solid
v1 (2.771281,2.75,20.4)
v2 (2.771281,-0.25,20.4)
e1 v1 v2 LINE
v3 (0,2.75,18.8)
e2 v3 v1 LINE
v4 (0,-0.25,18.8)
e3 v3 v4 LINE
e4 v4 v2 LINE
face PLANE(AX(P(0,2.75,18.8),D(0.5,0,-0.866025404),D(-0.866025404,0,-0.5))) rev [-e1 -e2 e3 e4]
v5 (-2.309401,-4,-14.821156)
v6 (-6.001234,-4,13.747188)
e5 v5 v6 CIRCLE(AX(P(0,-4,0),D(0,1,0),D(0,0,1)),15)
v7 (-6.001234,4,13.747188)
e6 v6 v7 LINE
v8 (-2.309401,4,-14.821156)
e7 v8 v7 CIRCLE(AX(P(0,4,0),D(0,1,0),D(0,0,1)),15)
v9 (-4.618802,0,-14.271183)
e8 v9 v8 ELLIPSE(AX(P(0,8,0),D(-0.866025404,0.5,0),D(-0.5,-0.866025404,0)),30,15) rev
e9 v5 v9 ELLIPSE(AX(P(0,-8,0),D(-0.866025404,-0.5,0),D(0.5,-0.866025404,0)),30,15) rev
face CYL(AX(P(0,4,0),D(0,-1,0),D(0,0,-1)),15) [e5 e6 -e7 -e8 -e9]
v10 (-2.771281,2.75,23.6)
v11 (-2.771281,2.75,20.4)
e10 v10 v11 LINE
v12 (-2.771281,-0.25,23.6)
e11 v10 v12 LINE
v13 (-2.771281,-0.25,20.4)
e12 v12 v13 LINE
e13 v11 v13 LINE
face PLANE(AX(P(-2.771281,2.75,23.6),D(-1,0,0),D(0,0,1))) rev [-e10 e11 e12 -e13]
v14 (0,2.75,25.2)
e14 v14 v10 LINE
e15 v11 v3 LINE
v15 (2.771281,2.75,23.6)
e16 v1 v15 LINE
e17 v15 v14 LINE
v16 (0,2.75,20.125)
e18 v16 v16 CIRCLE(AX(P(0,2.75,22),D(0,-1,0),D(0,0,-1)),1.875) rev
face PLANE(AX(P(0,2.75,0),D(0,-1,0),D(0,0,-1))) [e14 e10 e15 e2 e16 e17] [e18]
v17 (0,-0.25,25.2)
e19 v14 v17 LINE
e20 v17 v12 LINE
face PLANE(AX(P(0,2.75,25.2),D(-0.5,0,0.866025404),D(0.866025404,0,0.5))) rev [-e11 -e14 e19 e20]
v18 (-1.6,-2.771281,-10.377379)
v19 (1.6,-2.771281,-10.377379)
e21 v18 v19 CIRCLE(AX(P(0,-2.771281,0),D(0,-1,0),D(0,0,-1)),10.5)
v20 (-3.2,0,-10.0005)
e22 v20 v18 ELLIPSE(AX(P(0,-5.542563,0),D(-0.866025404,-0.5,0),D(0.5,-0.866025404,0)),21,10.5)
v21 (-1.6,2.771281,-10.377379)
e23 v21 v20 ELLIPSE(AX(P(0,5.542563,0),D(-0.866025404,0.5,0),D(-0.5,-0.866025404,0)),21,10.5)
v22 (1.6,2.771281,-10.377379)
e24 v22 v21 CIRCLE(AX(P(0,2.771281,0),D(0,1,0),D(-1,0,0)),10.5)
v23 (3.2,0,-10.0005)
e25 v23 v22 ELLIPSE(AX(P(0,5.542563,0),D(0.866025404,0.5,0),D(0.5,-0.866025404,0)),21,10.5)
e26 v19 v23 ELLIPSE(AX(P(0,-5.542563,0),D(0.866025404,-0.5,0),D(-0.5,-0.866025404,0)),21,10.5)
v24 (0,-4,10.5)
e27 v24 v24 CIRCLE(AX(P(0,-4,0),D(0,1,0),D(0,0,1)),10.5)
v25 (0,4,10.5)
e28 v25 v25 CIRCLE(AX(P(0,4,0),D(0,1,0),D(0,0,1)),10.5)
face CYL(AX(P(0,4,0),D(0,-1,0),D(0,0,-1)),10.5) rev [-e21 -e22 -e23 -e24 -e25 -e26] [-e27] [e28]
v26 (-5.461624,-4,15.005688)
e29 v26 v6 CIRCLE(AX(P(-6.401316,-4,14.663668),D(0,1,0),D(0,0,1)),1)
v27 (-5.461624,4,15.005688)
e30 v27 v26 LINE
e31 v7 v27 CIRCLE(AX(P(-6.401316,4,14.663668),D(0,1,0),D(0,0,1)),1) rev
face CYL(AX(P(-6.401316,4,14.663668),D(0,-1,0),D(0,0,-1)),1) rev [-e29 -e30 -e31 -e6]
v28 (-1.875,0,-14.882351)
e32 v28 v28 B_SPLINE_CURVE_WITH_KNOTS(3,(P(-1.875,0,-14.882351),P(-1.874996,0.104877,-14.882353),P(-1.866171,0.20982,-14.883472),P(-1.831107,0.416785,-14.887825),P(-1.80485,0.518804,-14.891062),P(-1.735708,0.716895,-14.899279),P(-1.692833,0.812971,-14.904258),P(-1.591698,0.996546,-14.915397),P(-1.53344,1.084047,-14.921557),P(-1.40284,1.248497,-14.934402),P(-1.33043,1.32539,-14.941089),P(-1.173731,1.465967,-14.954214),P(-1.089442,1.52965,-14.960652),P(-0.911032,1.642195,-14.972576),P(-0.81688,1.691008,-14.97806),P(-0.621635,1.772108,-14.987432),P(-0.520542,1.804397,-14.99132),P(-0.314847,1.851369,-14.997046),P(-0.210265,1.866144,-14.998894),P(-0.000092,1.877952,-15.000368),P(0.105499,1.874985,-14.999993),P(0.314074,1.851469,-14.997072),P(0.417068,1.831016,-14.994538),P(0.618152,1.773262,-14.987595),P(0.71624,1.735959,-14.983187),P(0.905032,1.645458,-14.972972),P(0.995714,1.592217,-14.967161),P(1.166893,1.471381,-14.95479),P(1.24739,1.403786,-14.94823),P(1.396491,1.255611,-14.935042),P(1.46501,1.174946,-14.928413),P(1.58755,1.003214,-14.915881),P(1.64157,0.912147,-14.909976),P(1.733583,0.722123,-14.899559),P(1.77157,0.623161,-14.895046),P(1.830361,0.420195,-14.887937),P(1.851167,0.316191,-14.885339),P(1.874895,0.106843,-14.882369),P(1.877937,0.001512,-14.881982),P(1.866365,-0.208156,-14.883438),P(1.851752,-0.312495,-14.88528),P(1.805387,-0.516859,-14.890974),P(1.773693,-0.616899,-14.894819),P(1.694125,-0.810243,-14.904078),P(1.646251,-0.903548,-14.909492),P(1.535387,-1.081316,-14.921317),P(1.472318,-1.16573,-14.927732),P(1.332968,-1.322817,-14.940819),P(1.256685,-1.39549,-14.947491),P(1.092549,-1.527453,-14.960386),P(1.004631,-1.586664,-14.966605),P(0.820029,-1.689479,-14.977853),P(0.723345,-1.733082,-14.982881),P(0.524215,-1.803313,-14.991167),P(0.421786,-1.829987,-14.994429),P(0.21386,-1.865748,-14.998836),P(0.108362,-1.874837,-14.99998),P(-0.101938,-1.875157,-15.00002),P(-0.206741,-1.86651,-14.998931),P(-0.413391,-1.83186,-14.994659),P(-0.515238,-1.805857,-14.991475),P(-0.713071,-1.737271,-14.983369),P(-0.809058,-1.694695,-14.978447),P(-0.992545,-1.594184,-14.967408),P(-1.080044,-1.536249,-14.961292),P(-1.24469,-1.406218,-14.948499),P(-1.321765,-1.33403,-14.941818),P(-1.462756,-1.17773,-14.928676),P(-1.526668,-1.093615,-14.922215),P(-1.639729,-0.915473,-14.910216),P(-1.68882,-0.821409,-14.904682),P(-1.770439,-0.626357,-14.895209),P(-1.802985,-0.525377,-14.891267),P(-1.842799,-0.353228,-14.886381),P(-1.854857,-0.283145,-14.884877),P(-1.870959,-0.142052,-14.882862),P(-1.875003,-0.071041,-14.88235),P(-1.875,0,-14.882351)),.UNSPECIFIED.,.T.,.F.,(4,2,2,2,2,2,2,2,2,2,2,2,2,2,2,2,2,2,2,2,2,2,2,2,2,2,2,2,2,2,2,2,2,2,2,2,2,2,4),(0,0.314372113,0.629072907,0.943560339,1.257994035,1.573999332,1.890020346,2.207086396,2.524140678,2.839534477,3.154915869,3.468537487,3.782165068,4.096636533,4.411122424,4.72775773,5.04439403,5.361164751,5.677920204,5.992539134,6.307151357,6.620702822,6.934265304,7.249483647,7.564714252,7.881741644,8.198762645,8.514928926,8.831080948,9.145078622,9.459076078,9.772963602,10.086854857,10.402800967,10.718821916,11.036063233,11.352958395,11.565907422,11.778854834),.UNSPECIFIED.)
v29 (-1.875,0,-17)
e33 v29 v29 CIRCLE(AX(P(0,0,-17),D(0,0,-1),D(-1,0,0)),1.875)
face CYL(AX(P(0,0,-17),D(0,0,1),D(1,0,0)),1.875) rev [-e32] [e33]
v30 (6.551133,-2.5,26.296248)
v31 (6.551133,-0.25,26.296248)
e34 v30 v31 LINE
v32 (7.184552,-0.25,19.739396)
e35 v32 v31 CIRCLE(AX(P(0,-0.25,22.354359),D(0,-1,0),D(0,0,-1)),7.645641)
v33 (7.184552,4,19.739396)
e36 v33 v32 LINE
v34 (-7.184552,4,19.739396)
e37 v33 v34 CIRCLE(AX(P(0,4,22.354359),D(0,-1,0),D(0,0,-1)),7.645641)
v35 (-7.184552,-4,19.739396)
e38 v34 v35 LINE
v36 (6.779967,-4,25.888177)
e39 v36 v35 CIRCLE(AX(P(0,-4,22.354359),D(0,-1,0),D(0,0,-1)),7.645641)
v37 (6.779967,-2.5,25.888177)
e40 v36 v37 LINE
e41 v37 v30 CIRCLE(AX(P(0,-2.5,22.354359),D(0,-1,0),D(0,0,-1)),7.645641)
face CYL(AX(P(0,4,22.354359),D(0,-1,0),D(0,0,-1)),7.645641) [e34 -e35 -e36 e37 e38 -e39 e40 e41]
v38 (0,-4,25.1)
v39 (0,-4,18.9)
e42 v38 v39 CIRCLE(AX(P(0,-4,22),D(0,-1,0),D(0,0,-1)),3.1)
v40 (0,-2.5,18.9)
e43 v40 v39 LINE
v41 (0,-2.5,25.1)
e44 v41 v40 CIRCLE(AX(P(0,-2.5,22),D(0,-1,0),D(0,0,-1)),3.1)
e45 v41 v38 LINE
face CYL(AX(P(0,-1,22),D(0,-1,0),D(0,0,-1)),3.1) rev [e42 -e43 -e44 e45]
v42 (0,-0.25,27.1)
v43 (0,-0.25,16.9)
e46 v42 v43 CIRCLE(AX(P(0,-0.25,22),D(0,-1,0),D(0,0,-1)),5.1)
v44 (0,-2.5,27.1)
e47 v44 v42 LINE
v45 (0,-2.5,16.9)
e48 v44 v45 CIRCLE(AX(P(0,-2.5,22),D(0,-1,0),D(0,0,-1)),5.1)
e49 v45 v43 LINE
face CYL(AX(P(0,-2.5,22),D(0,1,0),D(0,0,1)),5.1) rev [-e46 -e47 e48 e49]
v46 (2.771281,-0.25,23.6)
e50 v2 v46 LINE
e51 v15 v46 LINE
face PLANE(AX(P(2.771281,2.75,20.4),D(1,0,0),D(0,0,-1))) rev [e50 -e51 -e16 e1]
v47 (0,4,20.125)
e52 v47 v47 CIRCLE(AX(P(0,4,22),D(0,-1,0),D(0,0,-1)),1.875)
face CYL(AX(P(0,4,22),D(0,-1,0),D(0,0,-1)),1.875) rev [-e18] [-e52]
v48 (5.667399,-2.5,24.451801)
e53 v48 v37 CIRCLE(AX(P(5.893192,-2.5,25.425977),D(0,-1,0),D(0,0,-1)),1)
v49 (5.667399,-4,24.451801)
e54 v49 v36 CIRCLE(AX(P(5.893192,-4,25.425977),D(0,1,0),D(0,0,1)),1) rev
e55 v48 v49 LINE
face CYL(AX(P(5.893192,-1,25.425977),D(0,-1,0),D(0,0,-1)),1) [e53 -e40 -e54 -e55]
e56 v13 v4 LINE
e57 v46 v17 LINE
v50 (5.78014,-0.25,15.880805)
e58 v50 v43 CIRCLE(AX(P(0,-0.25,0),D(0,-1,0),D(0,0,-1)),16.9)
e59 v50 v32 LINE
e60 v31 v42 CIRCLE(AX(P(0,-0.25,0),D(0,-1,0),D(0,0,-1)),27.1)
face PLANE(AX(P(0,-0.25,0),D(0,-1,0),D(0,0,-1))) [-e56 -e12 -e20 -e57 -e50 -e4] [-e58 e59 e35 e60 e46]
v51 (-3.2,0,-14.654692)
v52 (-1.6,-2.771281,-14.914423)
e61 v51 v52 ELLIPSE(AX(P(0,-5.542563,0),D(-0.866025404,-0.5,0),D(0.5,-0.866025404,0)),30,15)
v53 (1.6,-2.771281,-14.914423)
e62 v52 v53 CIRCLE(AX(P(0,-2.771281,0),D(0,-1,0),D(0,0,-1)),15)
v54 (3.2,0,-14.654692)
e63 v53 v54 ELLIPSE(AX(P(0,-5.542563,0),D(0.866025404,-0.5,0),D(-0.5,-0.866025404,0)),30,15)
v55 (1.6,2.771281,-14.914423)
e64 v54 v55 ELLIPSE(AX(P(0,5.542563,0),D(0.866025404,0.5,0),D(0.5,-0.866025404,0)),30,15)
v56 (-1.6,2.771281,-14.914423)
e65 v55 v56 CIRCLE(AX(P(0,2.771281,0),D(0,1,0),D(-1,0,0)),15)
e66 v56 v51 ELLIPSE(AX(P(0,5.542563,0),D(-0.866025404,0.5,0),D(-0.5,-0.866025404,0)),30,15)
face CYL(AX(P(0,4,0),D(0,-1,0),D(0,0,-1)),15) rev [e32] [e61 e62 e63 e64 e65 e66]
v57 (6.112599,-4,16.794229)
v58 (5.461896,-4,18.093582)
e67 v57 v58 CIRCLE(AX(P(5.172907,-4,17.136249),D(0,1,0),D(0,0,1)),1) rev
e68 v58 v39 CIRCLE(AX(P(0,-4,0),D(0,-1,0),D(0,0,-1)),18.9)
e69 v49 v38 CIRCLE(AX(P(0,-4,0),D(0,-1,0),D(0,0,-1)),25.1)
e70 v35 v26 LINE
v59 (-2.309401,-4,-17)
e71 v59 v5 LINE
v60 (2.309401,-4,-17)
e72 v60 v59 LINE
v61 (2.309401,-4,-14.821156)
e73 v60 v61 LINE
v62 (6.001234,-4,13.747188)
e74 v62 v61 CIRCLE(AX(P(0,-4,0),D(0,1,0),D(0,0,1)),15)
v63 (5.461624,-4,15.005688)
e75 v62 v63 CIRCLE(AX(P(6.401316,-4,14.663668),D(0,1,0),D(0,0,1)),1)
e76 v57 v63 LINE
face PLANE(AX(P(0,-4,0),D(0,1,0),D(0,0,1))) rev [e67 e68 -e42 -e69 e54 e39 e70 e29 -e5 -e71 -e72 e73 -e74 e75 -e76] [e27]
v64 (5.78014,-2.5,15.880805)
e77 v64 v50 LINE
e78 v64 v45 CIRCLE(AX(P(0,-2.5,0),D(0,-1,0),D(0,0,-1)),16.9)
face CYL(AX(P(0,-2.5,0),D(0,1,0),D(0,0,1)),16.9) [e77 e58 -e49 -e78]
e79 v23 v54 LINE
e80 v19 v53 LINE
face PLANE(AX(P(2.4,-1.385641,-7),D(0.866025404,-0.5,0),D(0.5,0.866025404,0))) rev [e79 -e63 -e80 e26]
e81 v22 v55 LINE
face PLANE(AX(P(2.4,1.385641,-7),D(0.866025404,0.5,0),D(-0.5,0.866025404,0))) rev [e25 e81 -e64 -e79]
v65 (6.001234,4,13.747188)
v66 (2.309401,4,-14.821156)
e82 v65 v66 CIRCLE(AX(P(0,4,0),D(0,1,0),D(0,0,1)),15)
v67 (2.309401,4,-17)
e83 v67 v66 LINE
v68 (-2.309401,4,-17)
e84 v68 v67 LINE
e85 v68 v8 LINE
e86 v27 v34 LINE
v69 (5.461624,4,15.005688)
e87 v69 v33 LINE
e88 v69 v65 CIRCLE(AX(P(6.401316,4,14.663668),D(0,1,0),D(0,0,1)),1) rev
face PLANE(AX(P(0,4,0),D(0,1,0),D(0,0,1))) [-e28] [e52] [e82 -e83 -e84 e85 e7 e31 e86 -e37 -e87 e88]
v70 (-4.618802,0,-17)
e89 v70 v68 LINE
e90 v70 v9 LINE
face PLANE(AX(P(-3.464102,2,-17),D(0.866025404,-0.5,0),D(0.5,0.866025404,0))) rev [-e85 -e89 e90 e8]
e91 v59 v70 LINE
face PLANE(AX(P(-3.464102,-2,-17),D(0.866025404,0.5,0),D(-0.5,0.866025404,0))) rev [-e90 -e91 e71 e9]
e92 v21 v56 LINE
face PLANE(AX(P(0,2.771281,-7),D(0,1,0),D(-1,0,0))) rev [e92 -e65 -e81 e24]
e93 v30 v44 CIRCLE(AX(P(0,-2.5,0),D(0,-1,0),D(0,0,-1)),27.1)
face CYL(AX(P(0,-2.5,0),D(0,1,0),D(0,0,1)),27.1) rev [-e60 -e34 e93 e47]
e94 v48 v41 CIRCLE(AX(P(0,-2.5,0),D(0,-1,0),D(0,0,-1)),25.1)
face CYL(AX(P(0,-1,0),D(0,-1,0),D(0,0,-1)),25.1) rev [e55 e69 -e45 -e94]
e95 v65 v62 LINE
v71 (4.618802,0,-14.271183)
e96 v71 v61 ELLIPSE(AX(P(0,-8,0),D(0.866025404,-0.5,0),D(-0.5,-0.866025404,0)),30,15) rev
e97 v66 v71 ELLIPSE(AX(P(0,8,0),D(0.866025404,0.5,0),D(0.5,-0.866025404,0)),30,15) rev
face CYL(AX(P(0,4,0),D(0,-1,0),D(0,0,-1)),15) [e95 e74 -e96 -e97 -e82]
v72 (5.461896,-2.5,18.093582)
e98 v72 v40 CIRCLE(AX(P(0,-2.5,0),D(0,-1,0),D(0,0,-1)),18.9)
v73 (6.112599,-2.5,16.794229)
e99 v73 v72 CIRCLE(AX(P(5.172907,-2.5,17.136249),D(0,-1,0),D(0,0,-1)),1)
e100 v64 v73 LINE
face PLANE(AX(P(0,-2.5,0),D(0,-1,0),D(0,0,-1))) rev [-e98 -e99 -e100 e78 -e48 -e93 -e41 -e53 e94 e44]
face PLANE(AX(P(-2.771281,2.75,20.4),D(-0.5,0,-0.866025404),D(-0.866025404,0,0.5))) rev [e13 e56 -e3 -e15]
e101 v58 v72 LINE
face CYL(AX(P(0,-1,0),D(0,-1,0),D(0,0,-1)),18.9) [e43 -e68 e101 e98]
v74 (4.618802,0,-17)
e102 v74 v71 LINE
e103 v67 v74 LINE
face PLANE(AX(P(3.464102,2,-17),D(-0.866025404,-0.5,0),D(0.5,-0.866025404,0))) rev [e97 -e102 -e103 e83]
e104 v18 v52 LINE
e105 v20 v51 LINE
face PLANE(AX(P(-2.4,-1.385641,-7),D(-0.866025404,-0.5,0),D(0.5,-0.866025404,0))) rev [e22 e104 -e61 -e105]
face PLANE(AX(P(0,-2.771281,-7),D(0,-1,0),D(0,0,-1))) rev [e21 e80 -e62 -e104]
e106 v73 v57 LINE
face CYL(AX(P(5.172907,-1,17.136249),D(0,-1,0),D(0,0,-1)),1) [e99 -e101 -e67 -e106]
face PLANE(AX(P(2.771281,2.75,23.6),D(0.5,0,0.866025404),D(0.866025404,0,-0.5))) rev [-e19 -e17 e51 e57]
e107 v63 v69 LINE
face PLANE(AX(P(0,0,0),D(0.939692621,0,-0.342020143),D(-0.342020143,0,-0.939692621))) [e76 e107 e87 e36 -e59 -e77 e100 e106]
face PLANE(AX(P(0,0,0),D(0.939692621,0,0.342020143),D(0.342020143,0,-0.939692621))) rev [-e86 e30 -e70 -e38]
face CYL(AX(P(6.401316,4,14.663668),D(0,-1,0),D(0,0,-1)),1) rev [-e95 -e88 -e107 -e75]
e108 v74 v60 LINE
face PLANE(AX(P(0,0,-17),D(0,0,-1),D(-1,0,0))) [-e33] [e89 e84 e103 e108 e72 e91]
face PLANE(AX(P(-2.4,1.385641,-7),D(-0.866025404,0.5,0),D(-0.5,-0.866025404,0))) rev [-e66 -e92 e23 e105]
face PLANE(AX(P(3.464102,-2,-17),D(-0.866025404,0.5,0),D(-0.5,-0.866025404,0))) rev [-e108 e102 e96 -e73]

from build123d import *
from build123d.topology import SkipClean

# Parameters (mm, degrees)
CROQUIS1_R                          = 15
CROQUIS1_R_2                        = 10.5
SALIENTE_EXTRUIR1_DEPTH             = 4
CROQUIS2_R                          = 1.875
CORTAR_EXTRUIR1_DEPTH               = 8
SALIENTE_EXTRUIR2_REACH             = 35.779
SALIENTE_EXTRUIR2_END_RADIUS        = 15
CROQUIS2_4_R                        = 1.875
SALIENTE_EXTRUIR2_DIRECTION_2_DEPTH = 2
REVOLUCI_N1_ANGLE                   = 20
REVOLUCI_N1_OTHER_WAY_ANGLE         = 20
CORTAR_EXTRUIR6_DEPTH               = 35.481879299
CORTAR_EXTRUIR6_DEPTH_BACK          = 3
CROQUIS4_3_R                        = 1.875
CORTAR_EXTRUIR7_DEPTH               = 35.481879299
CORTAR_EXTRUIR8_START               = -8
CORTAR_EXTRUIR8_DEPTH               = 8
REDONDEO3_R                         = 1
SALIENTE_EXTRUIR3_START             = 5
SALIENTE_EXTRUIR3_DEPTH             = 5
CORTAR_EXTRUIR9_DEPTH               = 1.75
CORTAR_EXTRUIR9_DEPTH_BACK          = 0.5
SALIENTE_EXTRUIR4_OUTLINE_R         = 1.875
SALIENTE_EXTRUIR4_DEPTH             = 2.75
CORTAR_EXTRUIR10_DEPTH              = 3


# Read off the part's stored shape, not the designer's step: Cortar-Extruir8, Saliente-Extruir4
with BuildPart() as part:
    # Croquis1 → Saliente-Extruir1 (new, symmetric)
    with BuildSketch(Plane(origin=(0, 0, 0), x_dir=(1, 0, 0), z_dir=(0, 1, 0))):
        with Locations(Location((0, 0, 0), (0, 0, 270))):
            Circle(CROQUIS1_R)
        with Locations(Location((0, 0, 0), (0, 0, 270))):
            Circle(CROQUIS1_R_2, mode=Mode.SUBTRACT)
    extrude(amount=SALIENTE_EXTRUIR1_DEPTH, both=True)

    # Croquis2 → Cortar-Extruir1 (cut)
    with BuildSketch(Plane(origin=(0, 0, -15), x_dir=(-1, 0, 0), z_dir=(0, 0, -1))):
        Polygon((-3.2, 0), (-1.6, -2.771281292), (1.6, -2.771281292), (3.2, 0), (1.6, 2.771281292), (-1.6, 2.771281292), align=None)
        Circle(CROQUIS2_R)
    extrude(amount=-CORTAR_EXTRUIR1_DEPTH, mode=Mode.SUBTRACT)

    # Saliente-Extruir2: up to this cylinder (the profile starts outside it)
    with SkipClean():  # the faces are left unmerged after this step: merging them gives an invalid solid
        saliente_extruir2_end = Plane(origin=(0, -1.641104, 0), z_dir=(0, -1, 0)) * Cylinder(SALIENTE_EXTRUIR2_END_RADIUS, 103.15359, mode=Mode.PRIVATE)
        # Croquis2<4> → Saliente-Extruir2 (add, up to the surface)
        with BuildSketch(Plane(origin=(0, 0, -15), x_dir=(-1, 0, 0), z_dir=(0, 0, -1)), mode=Mode.PRIVATE) as saliente_extruir2_sk1:
            Polygon((-4.618802154, 0), (-2.309401077, -4), (2.309401077, -4), (4.618802154, 0), (2.309401077, 4), (-2.309401077, 4), align=None)
            Polygon((-1.6, -2.771281292), (1.6, -2.771281292), (3.2, 0), (1.6, 2.771281292), (-1.6, 2.771281292), (-3.2, 0), align=None, mode=Mode.SUBTRACT)
        saliente_extruir2_tool1 = extrude(saliente_extruir2_sk1.sketch, amount=-SALIENTE_EXTRUIR2_REACH, mode=Mode.PRIVATE) - saliente_extruir2_end
        add(saliente_extruir2_tool1.solids().sort_by_distance((3.358272, -1.938899, -15))[0])
        add(saliente_extruir2_tool1.solids().sort_by_distance((3.358272, -1.938899, -15))[1])
        # Croquis2<4> → Saliente-Extruir2 (add, up to the surface)
        with BuildSketch(Plane(origin=(0, 0, -15), x_dir=(-1, 0, 0), z_dir=(0, 0, -1)), mode=Mode.PRIVATE) as saliente_extruir2_sk2:
            Polygon((-3.2, 0), (-1.6, -2.771281292), (1.6, -2.771281292), (3.2, 0), (1.6, 2.771281292), (-1.6, 2.771281292), align=None)
            Circle(CROQUIS2_4_R, mode=Mode.SUBTRACT)
        saliente_extruir2_tool2 = extrude(saliente_extruir2_sk2.sketch, amount=-SALIENTE_EXTRUIR2_REACH, mode=Mode.PRIVATE) - saliente_extruir2_end
        add(saliente_extruir2_tool2.solids().sort_by_distance((2.326679, -1.343309, -15))[0])
        add(saliente_extruir2_tool2.solids().sort_by_distance((2.326679, -1.343309, -15))[1])

    # Croquis2<4> → Saliente-Extruir2 direction 2 (add)
    # profile 1 of 2: a face of its own
    with BuildSketch(Plane(origin=(0, 0, -15), x_dir=(-1, 0, 0), z_dir=(0, 0, -1))):
        Polygon((-4.618802154, 0), (-2.309401077, -4), (2.309401077, -4), (4.618802154, 0), (2.309401077, 4), (-2.309401077, 4), align=None)
        Polygon((-1.6, -2.771281292), (1.6, -2.771281292), (3.2, 0), (1.6, 2.771281292), (-1.6, 2.771281292), (-3.2, 0), align=None, mode=Mode.SUBTRACT)
    # profile 2 of 2: a face of its own
    with BuildSketch(Plane(origin=(0, 0, -15), x_dir=(-1, 0, 0), z_dir=(0, 0, -1))):
        Polygon((-3.2, 0), (-1.6, -2.771281292), (1.6, -2.771281292), (3.2, 0), (1.6, 2.771281292), (-1.6, 2.771281292), align=None)
        Circle(CROQUIS2_4_R, mode=Mode.SUBTRACT)
    extrude(amount=SALIENTE_EXTRUIR2_DIRECTION_2_DEPTH)

    # Croquis3 → Revolución1 (revolve)
    with BuildSketch(Plane(origin=(0, 0, 0), x_dir=(0, 0, -1), z_dir=(1, 0, 0))):
        Polygon((-30, 4), (-14, 4), (-14, -4), (-30, -4), (-30, -2.5), (-15, -2.5), (-15, 2.5), (-30, 2.5), align=None)
    revolve(axis=Axis((0, 4, 0), (0, -1, 0)), revolution_arc=REVOLUCI_N1_ANGLE)

    # Croquis3 → Revolución1 other way (revolve)
    with BuildSketch(Plane(origin=(0, 0, 0), x_dir=(0, 0, -1), z_dir=(1, 0, 0))):
        Polygon((-30, 4), (-14, 4), (-14, -4), (-30, -4), (-30, -2.5), (-15, -2.5), (-15, 2.5), (-30, 2.5), align=None)
    revolve(axis=Axis((0, 4, 0), (0, 1, 0)), revolution_arc=REVOLUCI_N1_OTHER_WAY_ANGLE)

    # Croquis4 → Cortar-Extruir6 (cut, two sides: drawn at the far end of the back side and taken through both)
    with BuildSketch(Plane.XZ.offset(4).offset(-CORTAR_EXTRUIR6_DEPTH_BACK)):
        with BuildLine():
            ThreePointArc((8.584705597, 23.586284782), (4.358569265, 24.7186746), (1.2e-08, 25.1))
            ThreePointArc((1.2e-08, 25.1), (-3.1, 22.000000006), (0, 18.9))
            ThreePointArc((0, 18.9), (3.281950558, 18.612866532), (6.464180709, 17.760190533))
            Line((6.464180709, 17.760190533), (8.584705597, 23.586284782))
        make_face()
    extrude(amount=CORTAR_EXTRUIR6_DEPTH + CORTAR_EXTRUIR6_DEPTH_BACK, mode=Mode.SUBTRACT)

    # Croquis4<3> → Cortar-Extruir7 (cut, through all)
    with BuildSketch(Plane.XZ.offset(4)):
        with Locations(Location((0, 22, 0), (0, 0, 270))):
            Circle(CROQUIS4_3_R)
    extrude(amount=-CORTAR_EXTRUIR7_DEPTH, mode=Mode.SUBTRACT)

    # Cortar-Extruir8 outline → Cortar-Extruir8 (cut)
    with BuildSketch(Plane.XZ.offset(4).offset(CORTAR_EXTRUIR8_START)):
        with BuildLine():
            ThreePointArc((-7.184552477, 19.7393957), (-6.262942497, 26.739718497), (1e-09, 30))
            ThreePointArc((1e-09, 30), (-5.20944533, 29.544232591), (-10.2606043, 28.190778624))
            Line((-10.2606043, 28.190778624), (-7.184552477, 19.7393957))
        make_face()
        with BuildLine():
            Line((7.184552477, 19.7393957), (8.584705598, 23.586284782))
            Line((8.584705598, 23.586284782), (10.2606043, 28.190778624))
            ThreePointArc((10.2606043, 28.190778624), (5.209445331, 29.54423259), (1e-09, 30))
            ThreePointArc((1e-09, 30), (6.262942498, 26.739718496), (7.184552477, 19.7393957))
        make_face()
    extrude(amount=CORTAR_EXTRUIR8_DEPTH, mode=Mode.SUBTRACT)

    # Redondeo3
    redondeo3_edges = [part.edges().sort_by_distance(p)[0] for p in [
        (6.464180709, -3.25, 17.760190533),
        (7.474898271, -3.25, 23.961133025),
        (-5.13030215, 3.25, 14.095389312),
        (-5.13030215, -3.25, 14.095389312),
        (5.13030215, 3.25, 14.095389312),
        (5.13030215, -3.25, 14.095389312),
    ]]
    fillet(redondeo3_edges, radius=REDONDEO3_R)

    # Croquis9 → Saliente-Extruir3 (add)
    with BuildSketch(Plane(origin=(0, -2.5, 0), x_dir=(1, 0, 0), z_dir=(0, 1, 0)).offset(SALIENTE_EXTRUIR3_START)):
        with BuildLine():
            Line((6.112599464, -16.794229002), (5.461623706, -15.005687805))
            ThreePointArc((5.461623706, -15.005687805), (5.482238333, -14.26959198), (6.001234056, -13.747188433))
            ThreePointArc((6.001234056, -13.747188433), (0, -15), (-6.001234056, -13.747188433))
            ThreePointArc((-6.001234056, -13.747188433), (-5.482238333, -14.26959198), (-5.461623706, -15.005687805))
            Line((-5.461623706, -15.005687805), (-7.184552477, -19.7393957))
            ThreePointArc((-7.184552477, -19.7393957), (-3.08103884, -29.351717504), (6.779967306, -25.888177056))
            ThreePointArc((6.779967306, -25.888177056), (6.683772805, -24.813619231), (5.667398999, -24.451801336))
            ThreePointArc((5.667398999, -24.451801336), (2.852173422, -24.93742382), (0, -25.1))
            ThreePointArc((0, -25.1), (-3.1, -22), (0, -18.9))
            ThreePointArc((0, -18.9), (2.760553354, -18.697308501), (5.461896053, -18.0935815))
            ThreePointArc((5.461896053, -18.0935815), (6.067051121, -17.584028122), (6.112599464, -16.794229002))
        make_face()
    extrude(amount=-SALIENTE_EXTRUIR3_DEPTH)

    # Croquis10 → Cortar-Extruir9 (cut, two sides: drawn at the far end of the back side and taken through both)
    with BuildSketch(Plane(origin=(0, -0.75, 0), x_dir=(-1, 0, 0), z_dir=(0, -1, 0)).offset(-CORTAR_EXTRUIR9_DEPTH_BACK)):
        with BuildLine():
            ThreePointArc((-6.779967306, -25.888177056), (-6.668671988, -26.09396334), (-6.551132513, -26.296248074))
            ThreePointArc((-6.551132513, -26.296248074), (-3.300127057, -26.898311497), (0, -27.1))
            ThreePointArc((0, -27.1), (5.1, -22), (0, -16.9))
            ThreePointArc((0, -16.9), (-1.942951583, -16.787940289), (-3.860136706, -16.453247236))
            ThreePointArc((-3.860136706, -16.453247236), (-4.828629021, -16.195503752), (-5.780140422, -15.880805291))
            Line((-5.780140422, -15.880805291), (-6.112599464, -16.794229002))
            ThreePointArc((-6.112599464, -16.794229002), (-6.067051121, -17.584028122), (-5.461896053, -18.0935815))
            ThreePointArc((-5.461896053, -18.0935815), (-2.760553354, -18.697308501), (0, -18.9))
            ThreePointArc((0, -18.9), (3.1, -22), (0, -25.1))
            ThreePointArc((0, -25.1), (-2.852173422, -24.93742382), (-5.667398999, -24.451801336))
            ThreePointArc((-5.667398999, -24.451801336), (-6.683772805, -24.813619231), (-6.779967306, -25.888177056))
        make_face()
    extrude(amount=CORTAR_EXTRUIR9_DEPTH + CORTAR_EXTRUIR9_DEPTH_BACK, mode=Mode.SUBTRACT)

    # Saliente-Extruir4 outline → Saliente-Extruir4 (add)
    with BuildSketch(Plane.XZ.offset(-2.5)):
        with BuildLine():
            ThreePointArc((5.461896053, 18.0935815), (6.067051121, 17.584028122), (6.112599464, 16.794229002))
            Line((6.112599464, 16.794229002), (7.184552477, 19.7393957))
            ThreePointArc((7.184552477, 19.7393957), (7.629143545, 22.856350834), (6.779967306, 25.888177056))
            ThreePointArc((6.779967306, 25.888177056), (6.683772805, 24.813619231), (5.667398999, 24.451801336))
            ThreePointArc((5.667398999, 24.451801336), (2.852173422, 24.93742382), (0, 25.1))
            ThreePointArc((0, 25.1), (-3.1, 22), (0, 18.9))
            ThreePointArc((0, 18.9), (2.760553354, 18.697308501), (5.461896053, 18.0935815))
        make_face()
        with Locations((0, 22)):
            Circle(SALIENTE_EXTRUIR4_OUTLINE_R, mode=Mode.SUBTRACT)
    extrude(amount=SALIENTE_EXTRUIR4_DEPTH)

    # Croquis12 → Cortar-Extruir10 (cut)
    with BuildSketch(Plane.XZ.offset(0.25)):
        Polygon((-2.771281292, 23.6), (-2.771281292, 20.4), (0, 18.8), (2.771281292, 20.4), (2.771281292, 23.6), (0, 25.2), align=None)
    extrude(amount=-CORTAR_EXTRUIR10_DEPTH, mode=Mode.SUBTRACT)


solid = part.part
